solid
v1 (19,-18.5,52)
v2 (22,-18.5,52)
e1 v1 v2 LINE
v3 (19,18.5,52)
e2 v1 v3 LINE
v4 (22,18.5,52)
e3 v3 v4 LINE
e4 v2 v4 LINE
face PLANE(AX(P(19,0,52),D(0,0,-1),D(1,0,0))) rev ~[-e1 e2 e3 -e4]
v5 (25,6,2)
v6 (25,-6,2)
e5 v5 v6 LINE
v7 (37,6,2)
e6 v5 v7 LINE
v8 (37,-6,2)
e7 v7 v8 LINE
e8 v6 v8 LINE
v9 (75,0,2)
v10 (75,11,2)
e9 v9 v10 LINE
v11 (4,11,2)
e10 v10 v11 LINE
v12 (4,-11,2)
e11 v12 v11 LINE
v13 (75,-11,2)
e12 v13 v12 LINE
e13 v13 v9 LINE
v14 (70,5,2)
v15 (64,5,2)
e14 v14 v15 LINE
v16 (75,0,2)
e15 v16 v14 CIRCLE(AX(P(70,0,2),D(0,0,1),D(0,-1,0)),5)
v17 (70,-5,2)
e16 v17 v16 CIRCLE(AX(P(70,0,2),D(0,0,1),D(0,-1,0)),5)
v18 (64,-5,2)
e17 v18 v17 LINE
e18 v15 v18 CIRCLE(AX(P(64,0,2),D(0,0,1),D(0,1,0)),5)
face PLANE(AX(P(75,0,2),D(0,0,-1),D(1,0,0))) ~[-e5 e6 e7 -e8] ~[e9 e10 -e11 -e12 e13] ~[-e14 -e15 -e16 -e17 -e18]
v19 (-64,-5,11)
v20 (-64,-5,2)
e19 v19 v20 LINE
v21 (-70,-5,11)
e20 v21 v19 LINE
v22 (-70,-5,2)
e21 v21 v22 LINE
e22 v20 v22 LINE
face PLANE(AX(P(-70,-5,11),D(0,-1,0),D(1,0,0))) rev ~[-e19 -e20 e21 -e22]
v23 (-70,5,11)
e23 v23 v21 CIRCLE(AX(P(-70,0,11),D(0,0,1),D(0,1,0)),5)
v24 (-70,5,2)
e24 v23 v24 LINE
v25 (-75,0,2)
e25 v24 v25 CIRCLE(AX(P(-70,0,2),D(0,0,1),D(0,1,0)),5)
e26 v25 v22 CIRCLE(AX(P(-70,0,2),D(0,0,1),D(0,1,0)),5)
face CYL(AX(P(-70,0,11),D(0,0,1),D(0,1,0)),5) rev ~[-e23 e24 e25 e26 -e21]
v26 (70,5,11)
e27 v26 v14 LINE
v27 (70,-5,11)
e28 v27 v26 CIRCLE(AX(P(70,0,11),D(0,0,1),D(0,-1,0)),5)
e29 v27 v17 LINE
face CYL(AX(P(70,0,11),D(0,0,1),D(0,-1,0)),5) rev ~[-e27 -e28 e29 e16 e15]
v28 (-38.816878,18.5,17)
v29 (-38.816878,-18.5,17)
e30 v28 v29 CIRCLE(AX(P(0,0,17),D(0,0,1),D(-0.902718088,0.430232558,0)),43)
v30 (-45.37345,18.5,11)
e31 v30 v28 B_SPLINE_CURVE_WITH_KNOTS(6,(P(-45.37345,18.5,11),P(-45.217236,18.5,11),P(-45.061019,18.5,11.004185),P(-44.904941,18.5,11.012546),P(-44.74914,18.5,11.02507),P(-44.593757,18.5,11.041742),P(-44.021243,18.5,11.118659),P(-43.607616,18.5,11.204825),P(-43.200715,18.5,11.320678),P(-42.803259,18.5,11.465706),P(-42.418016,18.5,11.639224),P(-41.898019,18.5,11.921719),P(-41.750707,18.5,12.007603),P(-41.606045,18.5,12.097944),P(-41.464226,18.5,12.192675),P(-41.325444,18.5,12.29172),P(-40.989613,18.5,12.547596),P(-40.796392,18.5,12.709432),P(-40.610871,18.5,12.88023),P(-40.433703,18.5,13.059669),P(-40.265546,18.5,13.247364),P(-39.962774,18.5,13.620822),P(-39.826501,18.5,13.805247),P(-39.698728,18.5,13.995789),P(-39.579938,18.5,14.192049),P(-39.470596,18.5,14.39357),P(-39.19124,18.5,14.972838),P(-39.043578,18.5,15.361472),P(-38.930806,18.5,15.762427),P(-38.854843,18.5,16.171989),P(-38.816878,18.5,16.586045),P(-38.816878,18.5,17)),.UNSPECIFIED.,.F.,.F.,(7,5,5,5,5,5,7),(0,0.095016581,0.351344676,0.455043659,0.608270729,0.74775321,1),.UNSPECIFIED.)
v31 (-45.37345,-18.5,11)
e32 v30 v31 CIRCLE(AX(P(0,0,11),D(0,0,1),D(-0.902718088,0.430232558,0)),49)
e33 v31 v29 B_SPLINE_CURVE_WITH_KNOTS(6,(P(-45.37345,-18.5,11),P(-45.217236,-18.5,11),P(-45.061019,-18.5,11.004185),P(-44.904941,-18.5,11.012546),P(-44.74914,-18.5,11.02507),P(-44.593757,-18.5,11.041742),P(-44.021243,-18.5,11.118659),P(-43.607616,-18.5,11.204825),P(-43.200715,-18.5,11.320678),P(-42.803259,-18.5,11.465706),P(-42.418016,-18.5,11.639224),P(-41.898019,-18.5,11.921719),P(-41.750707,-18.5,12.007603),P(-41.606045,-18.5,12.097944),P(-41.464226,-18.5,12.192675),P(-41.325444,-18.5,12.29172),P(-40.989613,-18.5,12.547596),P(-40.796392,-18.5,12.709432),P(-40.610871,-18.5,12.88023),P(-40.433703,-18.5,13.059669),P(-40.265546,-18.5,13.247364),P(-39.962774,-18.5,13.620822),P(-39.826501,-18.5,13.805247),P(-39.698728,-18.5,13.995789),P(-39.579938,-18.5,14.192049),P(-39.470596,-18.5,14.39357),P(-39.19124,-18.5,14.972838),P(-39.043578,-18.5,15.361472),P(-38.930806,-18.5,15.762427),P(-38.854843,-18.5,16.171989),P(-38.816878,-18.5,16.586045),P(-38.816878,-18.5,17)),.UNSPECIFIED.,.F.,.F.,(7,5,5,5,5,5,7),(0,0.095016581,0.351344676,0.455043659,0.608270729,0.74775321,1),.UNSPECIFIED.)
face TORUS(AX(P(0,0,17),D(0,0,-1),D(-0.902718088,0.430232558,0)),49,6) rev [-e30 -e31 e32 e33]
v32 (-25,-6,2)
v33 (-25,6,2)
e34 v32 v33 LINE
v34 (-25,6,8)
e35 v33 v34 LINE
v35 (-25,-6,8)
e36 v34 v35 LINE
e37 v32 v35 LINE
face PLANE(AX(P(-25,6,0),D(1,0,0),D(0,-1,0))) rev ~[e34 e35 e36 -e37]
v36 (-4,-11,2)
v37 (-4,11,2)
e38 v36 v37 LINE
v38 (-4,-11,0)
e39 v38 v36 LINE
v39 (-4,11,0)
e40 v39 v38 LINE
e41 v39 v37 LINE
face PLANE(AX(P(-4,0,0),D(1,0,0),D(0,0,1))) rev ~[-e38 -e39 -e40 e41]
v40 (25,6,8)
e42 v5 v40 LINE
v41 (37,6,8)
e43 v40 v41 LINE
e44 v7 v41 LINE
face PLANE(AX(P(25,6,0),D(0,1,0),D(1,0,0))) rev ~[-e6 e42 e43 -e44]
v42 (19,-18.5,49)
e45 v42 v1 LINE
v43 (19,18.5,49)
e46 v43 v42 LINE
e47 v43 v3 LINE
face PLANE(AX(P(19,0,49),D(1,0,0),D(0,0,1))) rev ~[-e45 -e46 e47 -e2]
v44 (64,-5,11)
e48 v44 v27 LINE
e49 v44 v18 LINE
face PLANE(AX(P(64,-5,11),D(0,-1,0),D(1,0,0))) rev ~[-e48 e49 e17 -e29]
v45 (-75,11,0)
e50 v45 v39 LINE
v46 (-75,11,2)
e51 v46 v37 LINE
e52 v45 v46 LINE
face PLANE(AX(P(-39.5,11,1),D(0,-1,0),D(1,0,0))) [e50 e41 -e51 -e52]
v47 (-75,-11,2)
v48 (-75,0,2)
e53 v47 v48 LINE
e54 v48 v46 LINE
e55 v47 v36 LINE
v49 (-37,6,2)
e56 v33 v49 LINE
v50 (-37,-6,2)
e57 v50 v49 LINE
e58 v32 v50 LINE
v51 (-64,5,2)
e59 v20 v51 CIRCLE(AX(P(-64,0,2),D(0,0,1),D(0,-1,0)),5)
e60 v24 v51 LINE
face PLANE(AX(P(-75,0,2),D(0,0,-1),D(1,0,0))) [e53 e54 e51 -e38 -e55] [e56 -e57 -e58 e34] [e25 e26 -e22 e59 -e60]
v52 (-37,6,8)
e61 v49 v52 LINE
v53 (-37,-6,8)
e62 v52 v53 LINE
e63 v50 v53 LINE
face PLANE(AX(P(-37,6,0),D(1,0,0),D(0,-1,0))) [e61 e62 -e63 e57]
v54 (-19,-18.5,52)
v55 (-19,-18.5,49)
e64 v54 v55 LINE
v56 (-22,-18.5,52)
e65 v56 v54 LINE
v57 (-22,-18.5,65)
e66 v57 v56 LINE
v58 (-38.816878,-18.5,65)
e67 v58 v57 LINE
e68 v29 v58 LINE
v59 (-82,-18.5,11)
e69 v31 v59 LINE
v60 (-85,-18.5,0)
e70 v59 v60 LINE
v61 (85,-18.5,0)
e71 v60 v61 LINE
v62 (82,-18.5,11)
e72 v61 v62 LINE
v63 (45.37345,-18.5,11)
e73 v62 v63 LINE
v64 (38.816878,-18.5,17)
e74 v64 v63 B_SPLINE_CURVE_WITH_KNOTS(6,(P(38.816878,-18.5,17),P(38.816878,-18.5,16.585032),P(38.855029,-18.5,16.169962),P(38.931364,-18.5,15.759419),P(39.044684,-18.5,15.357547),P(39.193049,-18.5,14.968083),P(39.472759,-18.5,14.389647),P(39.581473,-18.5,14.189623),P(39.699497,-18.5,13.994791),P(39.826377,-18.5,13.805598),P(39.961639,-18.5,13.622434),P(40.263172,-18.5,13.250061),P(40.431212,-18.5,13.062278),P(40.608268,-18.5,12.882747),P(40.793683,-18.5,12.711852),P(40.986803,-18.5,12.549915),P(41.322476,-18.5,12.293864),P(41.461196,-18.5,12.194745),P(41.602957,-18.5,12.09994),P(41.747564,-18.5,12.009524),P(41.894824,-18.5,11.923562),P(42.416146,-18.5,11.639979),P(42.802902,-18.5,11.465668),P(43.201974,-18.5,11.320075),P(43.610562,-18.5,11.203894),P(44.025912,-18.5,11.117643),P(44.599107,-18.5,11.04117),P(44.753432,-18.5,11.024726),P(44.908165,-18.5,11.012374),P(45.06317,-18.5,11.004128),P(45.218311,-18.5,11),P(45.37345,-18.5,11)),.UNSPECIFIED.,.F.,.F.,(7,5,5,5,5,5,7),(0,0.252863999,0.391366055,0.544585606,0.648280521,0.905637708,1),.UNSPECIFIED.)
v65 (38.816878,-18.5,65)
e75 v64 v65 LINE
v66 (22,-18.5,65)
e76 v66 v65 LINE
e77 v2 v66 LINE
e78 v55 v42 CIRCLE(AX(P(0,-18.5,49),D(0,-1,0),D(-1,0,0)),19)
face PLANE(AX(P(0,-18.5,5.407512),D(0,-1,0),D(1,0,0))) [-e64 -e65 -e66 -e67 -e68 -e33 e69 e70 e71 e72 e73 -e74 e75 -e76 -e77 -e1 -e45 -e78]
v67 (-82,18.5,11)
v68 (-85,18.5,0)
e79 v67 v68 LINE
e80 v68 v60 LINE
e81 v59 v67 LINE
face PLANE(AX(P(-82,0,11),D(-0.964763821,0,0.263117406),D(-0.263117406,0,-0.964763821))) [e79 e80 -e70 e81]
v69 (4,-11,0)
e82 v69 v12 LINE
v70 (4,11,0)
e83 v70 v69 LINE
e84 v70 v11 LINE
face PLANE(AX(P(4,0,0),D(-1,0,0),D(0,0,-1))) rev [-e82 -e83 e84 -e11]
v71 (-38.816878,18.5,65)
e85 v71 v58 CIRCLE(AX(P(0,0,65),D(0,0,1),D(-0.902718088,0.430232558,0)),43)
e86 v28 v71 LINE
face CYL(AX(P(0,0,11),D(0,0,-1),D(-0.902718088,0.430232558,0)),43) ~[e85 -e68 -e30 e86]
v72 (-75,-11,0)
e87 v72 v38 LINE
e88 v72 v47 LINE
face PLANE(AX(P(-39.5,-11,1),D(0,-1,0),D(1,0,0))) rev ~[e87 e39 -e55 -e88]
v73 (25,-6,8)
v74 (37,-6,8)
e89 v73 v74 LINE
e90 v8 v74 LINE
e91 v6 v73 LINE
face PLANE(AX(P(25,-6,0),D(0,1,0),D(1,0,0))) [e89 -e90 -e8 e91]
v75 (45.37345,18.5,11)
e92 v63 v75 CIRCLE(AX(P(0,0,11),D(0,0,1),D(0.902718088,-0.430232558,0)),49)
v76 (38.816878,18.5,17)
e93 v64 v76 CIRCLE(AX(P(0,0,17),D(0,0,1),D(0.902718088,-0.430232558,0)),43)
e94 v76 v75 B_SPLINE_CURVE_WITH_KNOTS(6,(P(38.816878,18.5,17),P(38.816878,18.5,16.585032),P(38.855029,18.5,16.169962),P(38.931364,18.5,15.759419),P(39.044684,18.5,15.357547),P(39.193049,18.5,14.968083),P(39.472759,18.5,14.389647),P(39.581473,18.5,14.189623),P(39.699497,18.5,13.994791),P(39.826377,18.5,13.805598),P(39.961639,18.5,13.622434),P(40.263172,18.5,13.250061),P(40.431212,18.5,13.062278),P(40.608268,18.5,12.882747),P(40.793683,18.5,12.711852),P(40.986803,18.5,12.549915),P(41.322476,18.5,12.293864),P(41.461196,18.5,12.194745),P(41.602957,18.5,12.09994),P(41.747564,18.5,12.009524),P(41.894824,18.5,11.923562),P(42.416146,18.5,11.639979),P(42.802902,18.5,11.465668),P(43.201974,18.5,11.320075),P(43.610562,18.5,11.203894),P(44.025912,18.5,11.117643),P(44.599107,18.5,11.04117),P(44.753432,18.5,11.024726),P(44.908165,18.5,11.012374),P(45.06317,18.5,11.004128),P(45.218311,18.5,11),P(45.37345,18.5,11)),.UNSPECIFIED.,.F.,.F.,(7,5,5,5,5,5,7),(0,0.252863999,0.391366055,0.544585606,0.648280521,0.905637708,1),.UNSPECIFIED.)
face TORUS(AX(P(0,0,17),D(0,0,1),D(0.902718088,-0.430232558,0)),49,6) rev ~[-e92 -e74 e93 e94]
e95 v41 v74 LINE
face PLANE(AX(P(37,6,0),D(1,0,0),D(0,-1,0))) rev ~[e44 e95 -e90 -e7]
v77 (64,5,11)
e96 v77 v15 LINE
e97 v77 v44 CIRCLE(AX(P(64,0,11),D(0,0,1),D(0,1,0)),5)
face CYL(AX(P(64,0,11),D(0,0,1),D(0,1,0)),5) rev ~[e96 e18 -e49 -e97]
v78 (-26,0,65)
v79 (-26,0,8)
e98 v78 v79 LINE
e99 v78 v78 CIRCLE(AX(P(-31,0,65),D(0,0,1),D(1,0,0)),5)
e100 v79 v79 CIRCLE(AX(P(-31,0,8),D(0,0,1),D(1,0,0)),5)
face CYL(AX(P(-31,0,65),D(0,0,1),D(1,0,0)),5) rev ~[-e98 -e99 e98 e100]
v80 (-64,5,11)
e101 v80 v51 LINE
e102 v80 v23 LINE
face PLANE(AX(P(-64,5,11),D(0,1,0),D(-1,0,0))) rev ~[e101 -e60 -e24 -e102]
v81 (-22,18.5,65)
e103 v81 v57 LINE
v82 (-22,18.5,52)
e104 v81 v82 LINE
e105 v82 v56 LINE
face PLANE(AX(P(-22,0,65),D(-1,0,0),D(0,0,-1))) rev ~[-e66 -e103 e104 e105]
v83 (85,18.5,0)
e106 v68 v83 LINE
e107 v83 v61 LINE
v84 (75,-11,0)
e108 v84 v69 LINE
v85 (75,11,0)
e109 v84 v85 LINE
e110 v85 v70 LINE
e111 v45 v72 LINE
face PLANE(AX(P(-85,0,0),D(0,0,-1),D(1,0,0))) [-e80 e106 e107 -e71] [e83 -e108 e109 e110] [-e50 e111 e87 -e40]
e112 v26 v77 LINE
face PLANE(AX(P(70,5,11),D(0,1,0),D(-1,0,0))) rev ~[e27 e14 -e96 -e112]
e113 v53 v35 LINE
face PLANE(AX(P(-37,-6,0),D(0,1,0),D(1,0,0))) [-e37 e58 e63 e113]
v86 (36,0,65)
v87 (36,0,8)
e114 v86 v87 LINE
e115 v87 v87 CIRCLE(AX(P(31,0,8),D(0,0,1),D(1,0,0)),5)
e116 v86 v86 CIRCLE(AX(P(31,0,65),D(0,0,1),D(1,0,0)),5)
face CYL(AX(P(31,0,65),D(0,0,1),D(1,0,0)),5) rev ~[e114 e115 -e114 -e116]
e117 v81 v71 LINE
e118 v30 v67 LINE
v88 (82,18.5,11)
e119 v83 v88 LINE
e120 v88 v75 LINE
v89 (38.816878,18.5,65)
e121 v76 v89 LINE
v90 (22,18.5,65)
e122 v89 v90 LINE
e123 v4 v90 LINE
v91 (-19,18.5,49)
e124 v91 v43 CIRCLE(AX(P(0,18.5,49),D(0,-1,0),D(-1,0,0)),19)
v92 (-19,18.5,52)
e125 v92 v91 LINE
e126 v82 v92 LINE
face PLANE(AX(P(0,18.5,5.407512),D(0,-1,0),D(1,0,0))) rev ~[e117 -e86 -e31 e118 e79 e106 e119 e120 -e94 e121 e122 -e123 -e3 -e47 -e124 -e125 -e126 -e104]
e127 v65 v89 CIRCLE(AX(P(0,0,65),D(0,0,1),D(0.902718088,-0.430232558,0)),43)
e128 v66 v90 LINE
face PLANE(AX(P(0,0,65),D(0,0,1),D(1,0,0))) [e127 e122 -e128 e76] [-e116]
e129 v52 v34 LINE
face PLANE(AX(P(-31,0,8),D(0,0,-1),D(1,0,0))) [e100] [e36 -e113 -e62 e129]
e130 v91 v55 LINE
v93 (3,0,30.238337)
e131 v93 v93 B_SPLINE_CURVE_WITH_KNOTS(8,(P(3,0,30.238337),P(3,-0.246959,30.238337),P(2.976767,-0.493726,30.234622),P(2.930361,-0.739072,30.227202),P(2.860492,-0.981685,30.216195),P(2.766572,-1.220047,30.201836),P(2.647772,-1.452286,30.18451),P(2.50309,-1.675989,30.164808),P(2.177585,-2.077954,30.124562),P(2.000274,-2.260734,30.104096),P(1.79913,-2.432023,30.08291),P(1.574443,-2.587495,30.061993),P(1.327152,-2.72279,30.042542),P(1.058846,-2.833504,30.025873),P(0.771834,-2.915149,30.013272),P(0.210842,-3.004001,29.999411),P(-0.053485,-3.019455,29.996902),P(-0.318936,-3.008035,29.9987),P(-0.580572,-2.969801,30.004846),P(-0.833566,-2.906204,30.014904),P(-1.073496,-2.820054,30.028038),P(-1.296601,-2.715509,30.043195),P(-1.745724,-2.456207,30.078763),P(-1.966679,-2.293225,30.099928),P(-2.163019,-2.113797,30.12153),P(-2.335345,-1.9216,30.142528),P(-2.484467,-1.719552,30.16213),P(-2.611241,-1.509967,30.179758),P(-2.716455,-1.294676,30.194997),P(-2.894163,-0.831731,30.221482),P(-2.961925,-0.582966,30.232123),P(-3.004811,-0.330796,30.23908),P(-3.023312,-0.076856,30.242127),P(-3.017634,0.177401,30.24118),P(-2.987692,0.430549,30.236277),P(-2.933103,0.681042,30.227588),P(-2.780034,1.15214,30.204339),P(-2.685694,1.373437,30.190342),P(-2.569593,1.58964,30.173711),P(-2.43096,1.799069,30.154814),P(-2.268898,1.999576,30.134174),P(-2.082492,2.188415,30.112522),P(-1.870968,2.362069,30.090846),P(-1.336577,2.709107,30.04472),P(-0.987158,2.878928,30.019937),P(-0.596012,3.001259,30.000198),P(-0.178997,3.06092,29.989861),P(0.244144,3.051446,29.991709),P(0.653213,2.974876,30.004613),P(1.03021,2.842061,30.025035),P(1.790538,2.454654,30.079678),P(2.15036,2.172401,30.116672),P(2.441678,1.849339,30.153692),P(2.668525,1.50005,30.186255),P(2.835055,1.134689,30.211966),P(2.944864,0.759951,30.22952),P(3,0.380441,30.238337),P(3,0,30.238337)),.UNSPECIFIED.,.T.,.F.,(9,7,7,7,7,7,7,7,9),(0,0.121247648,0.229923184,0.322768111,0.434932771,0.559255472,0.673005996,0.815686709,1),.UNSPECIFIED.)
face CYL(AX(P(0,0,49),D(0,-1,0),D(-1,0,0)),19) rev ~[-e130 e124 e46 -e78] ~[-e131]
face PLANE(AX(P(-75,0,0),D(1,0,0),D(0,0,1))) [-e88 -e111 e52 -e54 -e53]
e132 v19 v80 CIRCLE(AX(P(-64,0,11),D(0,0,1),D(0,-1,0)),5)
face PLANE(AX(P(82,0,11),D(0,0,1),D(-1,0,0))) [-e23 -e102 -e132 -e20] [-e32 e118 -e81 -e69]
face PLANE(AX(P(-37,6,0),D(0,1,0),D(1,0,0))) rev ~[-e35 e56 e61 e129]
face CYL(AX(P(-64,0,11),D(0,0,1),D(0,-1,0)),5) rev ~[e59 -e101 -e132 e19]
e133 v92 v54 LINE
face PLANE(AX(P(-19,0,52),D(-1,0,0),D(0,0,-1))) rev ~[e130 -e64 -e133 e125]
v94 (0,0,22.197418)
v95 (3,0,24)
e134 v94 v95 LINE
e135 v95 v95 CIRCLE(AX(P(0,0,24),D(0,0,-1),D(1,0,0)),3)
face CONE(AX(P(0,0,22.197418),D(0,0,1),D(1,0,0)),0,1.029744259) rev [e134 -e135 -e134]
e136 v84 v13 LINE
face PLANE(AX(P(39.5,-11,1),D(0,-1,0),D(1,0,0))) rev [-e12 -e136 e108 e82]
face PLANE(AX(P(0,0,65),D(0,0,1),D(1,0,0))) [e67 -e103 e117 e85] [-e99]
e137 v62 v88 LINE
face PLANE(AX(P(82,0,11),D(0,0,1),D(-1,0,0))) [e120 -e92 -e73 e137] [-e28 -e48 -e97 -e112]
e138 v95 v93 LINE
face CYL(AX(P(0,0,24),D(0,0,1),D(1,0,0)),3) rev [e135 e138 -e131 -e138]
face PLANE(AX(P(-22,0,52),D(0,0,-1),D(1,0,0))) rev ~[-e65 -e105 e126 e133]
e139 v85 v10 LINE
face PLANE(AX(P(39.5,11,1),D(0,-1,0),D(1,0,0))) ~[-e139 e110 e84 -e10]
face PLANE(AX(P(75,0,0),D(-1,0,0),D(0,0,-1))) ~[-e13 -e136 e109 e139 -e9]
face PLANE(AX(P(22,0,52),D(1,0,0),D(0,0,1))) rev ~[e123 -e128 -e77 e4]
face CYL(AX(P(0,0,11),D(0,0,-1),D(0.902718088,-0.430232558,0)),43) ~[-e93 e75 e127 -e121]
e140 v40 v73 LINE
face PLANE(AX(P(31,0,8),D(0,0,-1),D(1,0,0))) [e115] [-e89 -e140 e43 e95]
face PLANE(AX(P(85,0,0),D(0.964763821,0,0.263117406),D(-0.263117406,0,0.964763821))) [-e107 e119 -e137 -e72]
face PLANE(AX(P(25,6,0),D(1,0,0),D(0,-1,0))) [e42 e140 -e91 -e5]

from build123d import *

# Parameters (mm, degrees)
F1_DEPTH  = 18.5
F3_DEPTH  = 54
F5_DEPTH  = 48.5
F6_R      = 5
F7_DEPTH  = 65.001
F8_W      = 12
F8_H      = 12
F9_DEPTH  = 8
F10_W     = 71
F10_H     = 2
F11_DEPTH = 11
F13_DEPTH = 11.001
F17_R     = 6


# Not quite as in the source:
# - a pattern or mirror of a feature is missing from the dataset's text; its kind, count and spacing are read off the source's solid


with BuildPart() as f1:
    # F0 (on Front) → F1 (new body, symmetric)
    with BuildSketch(Plane.XZ):
        Polygon((-82, 11), (-85, 0), (85, 0), (82, 11), align=None)
    extrude(amount=F1_DEPTH, both=True)

    # F2 (on face) → F3 (join)
    with BuildSketch(Plane.XY.offset(11)):
        with BuildLine():
            Line((38.8168777724, 18.5), (-38.8168777724, 18.5))
            ThreePointArc((-38.8168777724, 18.5), (-43, 0), (-38.8168777724, -18.5))
            Line((-38.8168777724, -18.5), (38.8168777724, -18.5))
            ThreePointArc((38.8168777724, -18.5), (43, 0), (38.8168777724, 18.5))
        make_face()
    extrude(amount=F3_DEPTH)

    # F4 (on Front) → F5 (cut, symmetric)
    with BuildSketch(Plane.XZ):
        with BuildLine():
            Line((22, 65), (-22, 65))
            Line((-22, 65), (-22, 52))
            Line((-22, 52), (-19, 52))
            Line((-19, 52), (-19, 49))
            ThreePointArc((-19, 49), (0, 30), (19, 49))
            Line((19, 49), (19, 52))
            Line((19, 52), (22, 52))
            Line((22, 52), (22, 65))
        make_face()
    extrude(amount=F5_DEPTH, both=True, mode=Mode.SUBTRACT)

    # F6 (on face) → F7 (cut, through all)
    with BuildSketch(Plane.XY.offset(65)):
        with Locations((-31, 0)):
            Circle(F6_R)
        with Locations((31, 0)):
            Circle(F6_R)
    extrude(amount=-F7_DEPTH, mode=Mode.SUBTRACT)

    # F8 (on face) → F9 (cut)
    with BuildSketch(Plane(origin=(0, 0, 0), x_dir=(1, 0, 0), z_dir=(0, 0, -1))):
        with Locations((-31, 0)):
            Rectangle(F8_W, F8_H)
        with Locations((31, 0)):
            Rectangle(F8_W, F8_H)
    extrude(amount=-F9_DEPTH, mode=Mode.SUBTRACT)

    # F10 (on Front) → F11 (cut, symmetric)
    with BuildSketch(Plane.XZ):
        with Locations((-39.5, 1)):
            Rectangle(F10_W, F10_H)
    f11 = extrude(amount=F11_DEPTH, both=True, mode=Mode.SUBTRACT)

    # F11_copies: F11 across plane
    add(f11.mirror(Plane(origin=(0, 0, 0), x_dir=(0, 0, 1), z_dir=(1, 0, 0))), mode=Mode.SUBTRACT)

    # F12 (on face) → F13 (cut, through all)
    with BuildSketch(Plane.XY.offset(11)):
        with BuildLine():
            ThreePointArc((-70, 5), (-75, 0), (-70, -5))
            Line((-70, -5), (-64, -5))
            ThreePointArc((-64, -5), (-59, 0), (-64, 5))
            Line((-64, 5), (-70, 5))
        make_face()
        with BuildLine():
            ThreePointArc((70, -5), (75, 0), (70, 5))
            Line((70, 5), (64, 5))
            ThreePointArc((64, 5), (59, 0), (64, -5))
            Line((64, -5), (70, -5))
        make_face()
    extrude(amount=-F13_DEPTH, mode=Mode.SUBTRACT)

    # F14 (on Front) → F15 (revolve, cut)
    with BuildSketch(Plane.XZ):
        Polygon((3, 31.8085759505), (0, 31.8085759505), (0, 22.1974181429), (3, 24), align=None)
    revolve(axis=Axis((0, 0, 27.0029970467), (0, 0, -1)), mode=Mode.SUBTRACT)

    # F14 (on Front) → F16 (revolve, cut)
    with BuildSketch(Plane.XZ):
        Polygon((3, 31.8085759505), (0, 31.8085759505), (0, 22.1974181429), (3, 24), align=None)
    revolve(axis=Axis((0, 0, 27.0029970467), (0, 0, -1)), mode=Mode.SUBTRACT)

    # F17
    f17_edges = [f1.edges().sort_by_distance(p)[0] for p in [
        (43, 0, 11),
        (-43, 0, 11),
    ]]
    fillet(f17_edges, radius=F17_R)


solid = f1.part
